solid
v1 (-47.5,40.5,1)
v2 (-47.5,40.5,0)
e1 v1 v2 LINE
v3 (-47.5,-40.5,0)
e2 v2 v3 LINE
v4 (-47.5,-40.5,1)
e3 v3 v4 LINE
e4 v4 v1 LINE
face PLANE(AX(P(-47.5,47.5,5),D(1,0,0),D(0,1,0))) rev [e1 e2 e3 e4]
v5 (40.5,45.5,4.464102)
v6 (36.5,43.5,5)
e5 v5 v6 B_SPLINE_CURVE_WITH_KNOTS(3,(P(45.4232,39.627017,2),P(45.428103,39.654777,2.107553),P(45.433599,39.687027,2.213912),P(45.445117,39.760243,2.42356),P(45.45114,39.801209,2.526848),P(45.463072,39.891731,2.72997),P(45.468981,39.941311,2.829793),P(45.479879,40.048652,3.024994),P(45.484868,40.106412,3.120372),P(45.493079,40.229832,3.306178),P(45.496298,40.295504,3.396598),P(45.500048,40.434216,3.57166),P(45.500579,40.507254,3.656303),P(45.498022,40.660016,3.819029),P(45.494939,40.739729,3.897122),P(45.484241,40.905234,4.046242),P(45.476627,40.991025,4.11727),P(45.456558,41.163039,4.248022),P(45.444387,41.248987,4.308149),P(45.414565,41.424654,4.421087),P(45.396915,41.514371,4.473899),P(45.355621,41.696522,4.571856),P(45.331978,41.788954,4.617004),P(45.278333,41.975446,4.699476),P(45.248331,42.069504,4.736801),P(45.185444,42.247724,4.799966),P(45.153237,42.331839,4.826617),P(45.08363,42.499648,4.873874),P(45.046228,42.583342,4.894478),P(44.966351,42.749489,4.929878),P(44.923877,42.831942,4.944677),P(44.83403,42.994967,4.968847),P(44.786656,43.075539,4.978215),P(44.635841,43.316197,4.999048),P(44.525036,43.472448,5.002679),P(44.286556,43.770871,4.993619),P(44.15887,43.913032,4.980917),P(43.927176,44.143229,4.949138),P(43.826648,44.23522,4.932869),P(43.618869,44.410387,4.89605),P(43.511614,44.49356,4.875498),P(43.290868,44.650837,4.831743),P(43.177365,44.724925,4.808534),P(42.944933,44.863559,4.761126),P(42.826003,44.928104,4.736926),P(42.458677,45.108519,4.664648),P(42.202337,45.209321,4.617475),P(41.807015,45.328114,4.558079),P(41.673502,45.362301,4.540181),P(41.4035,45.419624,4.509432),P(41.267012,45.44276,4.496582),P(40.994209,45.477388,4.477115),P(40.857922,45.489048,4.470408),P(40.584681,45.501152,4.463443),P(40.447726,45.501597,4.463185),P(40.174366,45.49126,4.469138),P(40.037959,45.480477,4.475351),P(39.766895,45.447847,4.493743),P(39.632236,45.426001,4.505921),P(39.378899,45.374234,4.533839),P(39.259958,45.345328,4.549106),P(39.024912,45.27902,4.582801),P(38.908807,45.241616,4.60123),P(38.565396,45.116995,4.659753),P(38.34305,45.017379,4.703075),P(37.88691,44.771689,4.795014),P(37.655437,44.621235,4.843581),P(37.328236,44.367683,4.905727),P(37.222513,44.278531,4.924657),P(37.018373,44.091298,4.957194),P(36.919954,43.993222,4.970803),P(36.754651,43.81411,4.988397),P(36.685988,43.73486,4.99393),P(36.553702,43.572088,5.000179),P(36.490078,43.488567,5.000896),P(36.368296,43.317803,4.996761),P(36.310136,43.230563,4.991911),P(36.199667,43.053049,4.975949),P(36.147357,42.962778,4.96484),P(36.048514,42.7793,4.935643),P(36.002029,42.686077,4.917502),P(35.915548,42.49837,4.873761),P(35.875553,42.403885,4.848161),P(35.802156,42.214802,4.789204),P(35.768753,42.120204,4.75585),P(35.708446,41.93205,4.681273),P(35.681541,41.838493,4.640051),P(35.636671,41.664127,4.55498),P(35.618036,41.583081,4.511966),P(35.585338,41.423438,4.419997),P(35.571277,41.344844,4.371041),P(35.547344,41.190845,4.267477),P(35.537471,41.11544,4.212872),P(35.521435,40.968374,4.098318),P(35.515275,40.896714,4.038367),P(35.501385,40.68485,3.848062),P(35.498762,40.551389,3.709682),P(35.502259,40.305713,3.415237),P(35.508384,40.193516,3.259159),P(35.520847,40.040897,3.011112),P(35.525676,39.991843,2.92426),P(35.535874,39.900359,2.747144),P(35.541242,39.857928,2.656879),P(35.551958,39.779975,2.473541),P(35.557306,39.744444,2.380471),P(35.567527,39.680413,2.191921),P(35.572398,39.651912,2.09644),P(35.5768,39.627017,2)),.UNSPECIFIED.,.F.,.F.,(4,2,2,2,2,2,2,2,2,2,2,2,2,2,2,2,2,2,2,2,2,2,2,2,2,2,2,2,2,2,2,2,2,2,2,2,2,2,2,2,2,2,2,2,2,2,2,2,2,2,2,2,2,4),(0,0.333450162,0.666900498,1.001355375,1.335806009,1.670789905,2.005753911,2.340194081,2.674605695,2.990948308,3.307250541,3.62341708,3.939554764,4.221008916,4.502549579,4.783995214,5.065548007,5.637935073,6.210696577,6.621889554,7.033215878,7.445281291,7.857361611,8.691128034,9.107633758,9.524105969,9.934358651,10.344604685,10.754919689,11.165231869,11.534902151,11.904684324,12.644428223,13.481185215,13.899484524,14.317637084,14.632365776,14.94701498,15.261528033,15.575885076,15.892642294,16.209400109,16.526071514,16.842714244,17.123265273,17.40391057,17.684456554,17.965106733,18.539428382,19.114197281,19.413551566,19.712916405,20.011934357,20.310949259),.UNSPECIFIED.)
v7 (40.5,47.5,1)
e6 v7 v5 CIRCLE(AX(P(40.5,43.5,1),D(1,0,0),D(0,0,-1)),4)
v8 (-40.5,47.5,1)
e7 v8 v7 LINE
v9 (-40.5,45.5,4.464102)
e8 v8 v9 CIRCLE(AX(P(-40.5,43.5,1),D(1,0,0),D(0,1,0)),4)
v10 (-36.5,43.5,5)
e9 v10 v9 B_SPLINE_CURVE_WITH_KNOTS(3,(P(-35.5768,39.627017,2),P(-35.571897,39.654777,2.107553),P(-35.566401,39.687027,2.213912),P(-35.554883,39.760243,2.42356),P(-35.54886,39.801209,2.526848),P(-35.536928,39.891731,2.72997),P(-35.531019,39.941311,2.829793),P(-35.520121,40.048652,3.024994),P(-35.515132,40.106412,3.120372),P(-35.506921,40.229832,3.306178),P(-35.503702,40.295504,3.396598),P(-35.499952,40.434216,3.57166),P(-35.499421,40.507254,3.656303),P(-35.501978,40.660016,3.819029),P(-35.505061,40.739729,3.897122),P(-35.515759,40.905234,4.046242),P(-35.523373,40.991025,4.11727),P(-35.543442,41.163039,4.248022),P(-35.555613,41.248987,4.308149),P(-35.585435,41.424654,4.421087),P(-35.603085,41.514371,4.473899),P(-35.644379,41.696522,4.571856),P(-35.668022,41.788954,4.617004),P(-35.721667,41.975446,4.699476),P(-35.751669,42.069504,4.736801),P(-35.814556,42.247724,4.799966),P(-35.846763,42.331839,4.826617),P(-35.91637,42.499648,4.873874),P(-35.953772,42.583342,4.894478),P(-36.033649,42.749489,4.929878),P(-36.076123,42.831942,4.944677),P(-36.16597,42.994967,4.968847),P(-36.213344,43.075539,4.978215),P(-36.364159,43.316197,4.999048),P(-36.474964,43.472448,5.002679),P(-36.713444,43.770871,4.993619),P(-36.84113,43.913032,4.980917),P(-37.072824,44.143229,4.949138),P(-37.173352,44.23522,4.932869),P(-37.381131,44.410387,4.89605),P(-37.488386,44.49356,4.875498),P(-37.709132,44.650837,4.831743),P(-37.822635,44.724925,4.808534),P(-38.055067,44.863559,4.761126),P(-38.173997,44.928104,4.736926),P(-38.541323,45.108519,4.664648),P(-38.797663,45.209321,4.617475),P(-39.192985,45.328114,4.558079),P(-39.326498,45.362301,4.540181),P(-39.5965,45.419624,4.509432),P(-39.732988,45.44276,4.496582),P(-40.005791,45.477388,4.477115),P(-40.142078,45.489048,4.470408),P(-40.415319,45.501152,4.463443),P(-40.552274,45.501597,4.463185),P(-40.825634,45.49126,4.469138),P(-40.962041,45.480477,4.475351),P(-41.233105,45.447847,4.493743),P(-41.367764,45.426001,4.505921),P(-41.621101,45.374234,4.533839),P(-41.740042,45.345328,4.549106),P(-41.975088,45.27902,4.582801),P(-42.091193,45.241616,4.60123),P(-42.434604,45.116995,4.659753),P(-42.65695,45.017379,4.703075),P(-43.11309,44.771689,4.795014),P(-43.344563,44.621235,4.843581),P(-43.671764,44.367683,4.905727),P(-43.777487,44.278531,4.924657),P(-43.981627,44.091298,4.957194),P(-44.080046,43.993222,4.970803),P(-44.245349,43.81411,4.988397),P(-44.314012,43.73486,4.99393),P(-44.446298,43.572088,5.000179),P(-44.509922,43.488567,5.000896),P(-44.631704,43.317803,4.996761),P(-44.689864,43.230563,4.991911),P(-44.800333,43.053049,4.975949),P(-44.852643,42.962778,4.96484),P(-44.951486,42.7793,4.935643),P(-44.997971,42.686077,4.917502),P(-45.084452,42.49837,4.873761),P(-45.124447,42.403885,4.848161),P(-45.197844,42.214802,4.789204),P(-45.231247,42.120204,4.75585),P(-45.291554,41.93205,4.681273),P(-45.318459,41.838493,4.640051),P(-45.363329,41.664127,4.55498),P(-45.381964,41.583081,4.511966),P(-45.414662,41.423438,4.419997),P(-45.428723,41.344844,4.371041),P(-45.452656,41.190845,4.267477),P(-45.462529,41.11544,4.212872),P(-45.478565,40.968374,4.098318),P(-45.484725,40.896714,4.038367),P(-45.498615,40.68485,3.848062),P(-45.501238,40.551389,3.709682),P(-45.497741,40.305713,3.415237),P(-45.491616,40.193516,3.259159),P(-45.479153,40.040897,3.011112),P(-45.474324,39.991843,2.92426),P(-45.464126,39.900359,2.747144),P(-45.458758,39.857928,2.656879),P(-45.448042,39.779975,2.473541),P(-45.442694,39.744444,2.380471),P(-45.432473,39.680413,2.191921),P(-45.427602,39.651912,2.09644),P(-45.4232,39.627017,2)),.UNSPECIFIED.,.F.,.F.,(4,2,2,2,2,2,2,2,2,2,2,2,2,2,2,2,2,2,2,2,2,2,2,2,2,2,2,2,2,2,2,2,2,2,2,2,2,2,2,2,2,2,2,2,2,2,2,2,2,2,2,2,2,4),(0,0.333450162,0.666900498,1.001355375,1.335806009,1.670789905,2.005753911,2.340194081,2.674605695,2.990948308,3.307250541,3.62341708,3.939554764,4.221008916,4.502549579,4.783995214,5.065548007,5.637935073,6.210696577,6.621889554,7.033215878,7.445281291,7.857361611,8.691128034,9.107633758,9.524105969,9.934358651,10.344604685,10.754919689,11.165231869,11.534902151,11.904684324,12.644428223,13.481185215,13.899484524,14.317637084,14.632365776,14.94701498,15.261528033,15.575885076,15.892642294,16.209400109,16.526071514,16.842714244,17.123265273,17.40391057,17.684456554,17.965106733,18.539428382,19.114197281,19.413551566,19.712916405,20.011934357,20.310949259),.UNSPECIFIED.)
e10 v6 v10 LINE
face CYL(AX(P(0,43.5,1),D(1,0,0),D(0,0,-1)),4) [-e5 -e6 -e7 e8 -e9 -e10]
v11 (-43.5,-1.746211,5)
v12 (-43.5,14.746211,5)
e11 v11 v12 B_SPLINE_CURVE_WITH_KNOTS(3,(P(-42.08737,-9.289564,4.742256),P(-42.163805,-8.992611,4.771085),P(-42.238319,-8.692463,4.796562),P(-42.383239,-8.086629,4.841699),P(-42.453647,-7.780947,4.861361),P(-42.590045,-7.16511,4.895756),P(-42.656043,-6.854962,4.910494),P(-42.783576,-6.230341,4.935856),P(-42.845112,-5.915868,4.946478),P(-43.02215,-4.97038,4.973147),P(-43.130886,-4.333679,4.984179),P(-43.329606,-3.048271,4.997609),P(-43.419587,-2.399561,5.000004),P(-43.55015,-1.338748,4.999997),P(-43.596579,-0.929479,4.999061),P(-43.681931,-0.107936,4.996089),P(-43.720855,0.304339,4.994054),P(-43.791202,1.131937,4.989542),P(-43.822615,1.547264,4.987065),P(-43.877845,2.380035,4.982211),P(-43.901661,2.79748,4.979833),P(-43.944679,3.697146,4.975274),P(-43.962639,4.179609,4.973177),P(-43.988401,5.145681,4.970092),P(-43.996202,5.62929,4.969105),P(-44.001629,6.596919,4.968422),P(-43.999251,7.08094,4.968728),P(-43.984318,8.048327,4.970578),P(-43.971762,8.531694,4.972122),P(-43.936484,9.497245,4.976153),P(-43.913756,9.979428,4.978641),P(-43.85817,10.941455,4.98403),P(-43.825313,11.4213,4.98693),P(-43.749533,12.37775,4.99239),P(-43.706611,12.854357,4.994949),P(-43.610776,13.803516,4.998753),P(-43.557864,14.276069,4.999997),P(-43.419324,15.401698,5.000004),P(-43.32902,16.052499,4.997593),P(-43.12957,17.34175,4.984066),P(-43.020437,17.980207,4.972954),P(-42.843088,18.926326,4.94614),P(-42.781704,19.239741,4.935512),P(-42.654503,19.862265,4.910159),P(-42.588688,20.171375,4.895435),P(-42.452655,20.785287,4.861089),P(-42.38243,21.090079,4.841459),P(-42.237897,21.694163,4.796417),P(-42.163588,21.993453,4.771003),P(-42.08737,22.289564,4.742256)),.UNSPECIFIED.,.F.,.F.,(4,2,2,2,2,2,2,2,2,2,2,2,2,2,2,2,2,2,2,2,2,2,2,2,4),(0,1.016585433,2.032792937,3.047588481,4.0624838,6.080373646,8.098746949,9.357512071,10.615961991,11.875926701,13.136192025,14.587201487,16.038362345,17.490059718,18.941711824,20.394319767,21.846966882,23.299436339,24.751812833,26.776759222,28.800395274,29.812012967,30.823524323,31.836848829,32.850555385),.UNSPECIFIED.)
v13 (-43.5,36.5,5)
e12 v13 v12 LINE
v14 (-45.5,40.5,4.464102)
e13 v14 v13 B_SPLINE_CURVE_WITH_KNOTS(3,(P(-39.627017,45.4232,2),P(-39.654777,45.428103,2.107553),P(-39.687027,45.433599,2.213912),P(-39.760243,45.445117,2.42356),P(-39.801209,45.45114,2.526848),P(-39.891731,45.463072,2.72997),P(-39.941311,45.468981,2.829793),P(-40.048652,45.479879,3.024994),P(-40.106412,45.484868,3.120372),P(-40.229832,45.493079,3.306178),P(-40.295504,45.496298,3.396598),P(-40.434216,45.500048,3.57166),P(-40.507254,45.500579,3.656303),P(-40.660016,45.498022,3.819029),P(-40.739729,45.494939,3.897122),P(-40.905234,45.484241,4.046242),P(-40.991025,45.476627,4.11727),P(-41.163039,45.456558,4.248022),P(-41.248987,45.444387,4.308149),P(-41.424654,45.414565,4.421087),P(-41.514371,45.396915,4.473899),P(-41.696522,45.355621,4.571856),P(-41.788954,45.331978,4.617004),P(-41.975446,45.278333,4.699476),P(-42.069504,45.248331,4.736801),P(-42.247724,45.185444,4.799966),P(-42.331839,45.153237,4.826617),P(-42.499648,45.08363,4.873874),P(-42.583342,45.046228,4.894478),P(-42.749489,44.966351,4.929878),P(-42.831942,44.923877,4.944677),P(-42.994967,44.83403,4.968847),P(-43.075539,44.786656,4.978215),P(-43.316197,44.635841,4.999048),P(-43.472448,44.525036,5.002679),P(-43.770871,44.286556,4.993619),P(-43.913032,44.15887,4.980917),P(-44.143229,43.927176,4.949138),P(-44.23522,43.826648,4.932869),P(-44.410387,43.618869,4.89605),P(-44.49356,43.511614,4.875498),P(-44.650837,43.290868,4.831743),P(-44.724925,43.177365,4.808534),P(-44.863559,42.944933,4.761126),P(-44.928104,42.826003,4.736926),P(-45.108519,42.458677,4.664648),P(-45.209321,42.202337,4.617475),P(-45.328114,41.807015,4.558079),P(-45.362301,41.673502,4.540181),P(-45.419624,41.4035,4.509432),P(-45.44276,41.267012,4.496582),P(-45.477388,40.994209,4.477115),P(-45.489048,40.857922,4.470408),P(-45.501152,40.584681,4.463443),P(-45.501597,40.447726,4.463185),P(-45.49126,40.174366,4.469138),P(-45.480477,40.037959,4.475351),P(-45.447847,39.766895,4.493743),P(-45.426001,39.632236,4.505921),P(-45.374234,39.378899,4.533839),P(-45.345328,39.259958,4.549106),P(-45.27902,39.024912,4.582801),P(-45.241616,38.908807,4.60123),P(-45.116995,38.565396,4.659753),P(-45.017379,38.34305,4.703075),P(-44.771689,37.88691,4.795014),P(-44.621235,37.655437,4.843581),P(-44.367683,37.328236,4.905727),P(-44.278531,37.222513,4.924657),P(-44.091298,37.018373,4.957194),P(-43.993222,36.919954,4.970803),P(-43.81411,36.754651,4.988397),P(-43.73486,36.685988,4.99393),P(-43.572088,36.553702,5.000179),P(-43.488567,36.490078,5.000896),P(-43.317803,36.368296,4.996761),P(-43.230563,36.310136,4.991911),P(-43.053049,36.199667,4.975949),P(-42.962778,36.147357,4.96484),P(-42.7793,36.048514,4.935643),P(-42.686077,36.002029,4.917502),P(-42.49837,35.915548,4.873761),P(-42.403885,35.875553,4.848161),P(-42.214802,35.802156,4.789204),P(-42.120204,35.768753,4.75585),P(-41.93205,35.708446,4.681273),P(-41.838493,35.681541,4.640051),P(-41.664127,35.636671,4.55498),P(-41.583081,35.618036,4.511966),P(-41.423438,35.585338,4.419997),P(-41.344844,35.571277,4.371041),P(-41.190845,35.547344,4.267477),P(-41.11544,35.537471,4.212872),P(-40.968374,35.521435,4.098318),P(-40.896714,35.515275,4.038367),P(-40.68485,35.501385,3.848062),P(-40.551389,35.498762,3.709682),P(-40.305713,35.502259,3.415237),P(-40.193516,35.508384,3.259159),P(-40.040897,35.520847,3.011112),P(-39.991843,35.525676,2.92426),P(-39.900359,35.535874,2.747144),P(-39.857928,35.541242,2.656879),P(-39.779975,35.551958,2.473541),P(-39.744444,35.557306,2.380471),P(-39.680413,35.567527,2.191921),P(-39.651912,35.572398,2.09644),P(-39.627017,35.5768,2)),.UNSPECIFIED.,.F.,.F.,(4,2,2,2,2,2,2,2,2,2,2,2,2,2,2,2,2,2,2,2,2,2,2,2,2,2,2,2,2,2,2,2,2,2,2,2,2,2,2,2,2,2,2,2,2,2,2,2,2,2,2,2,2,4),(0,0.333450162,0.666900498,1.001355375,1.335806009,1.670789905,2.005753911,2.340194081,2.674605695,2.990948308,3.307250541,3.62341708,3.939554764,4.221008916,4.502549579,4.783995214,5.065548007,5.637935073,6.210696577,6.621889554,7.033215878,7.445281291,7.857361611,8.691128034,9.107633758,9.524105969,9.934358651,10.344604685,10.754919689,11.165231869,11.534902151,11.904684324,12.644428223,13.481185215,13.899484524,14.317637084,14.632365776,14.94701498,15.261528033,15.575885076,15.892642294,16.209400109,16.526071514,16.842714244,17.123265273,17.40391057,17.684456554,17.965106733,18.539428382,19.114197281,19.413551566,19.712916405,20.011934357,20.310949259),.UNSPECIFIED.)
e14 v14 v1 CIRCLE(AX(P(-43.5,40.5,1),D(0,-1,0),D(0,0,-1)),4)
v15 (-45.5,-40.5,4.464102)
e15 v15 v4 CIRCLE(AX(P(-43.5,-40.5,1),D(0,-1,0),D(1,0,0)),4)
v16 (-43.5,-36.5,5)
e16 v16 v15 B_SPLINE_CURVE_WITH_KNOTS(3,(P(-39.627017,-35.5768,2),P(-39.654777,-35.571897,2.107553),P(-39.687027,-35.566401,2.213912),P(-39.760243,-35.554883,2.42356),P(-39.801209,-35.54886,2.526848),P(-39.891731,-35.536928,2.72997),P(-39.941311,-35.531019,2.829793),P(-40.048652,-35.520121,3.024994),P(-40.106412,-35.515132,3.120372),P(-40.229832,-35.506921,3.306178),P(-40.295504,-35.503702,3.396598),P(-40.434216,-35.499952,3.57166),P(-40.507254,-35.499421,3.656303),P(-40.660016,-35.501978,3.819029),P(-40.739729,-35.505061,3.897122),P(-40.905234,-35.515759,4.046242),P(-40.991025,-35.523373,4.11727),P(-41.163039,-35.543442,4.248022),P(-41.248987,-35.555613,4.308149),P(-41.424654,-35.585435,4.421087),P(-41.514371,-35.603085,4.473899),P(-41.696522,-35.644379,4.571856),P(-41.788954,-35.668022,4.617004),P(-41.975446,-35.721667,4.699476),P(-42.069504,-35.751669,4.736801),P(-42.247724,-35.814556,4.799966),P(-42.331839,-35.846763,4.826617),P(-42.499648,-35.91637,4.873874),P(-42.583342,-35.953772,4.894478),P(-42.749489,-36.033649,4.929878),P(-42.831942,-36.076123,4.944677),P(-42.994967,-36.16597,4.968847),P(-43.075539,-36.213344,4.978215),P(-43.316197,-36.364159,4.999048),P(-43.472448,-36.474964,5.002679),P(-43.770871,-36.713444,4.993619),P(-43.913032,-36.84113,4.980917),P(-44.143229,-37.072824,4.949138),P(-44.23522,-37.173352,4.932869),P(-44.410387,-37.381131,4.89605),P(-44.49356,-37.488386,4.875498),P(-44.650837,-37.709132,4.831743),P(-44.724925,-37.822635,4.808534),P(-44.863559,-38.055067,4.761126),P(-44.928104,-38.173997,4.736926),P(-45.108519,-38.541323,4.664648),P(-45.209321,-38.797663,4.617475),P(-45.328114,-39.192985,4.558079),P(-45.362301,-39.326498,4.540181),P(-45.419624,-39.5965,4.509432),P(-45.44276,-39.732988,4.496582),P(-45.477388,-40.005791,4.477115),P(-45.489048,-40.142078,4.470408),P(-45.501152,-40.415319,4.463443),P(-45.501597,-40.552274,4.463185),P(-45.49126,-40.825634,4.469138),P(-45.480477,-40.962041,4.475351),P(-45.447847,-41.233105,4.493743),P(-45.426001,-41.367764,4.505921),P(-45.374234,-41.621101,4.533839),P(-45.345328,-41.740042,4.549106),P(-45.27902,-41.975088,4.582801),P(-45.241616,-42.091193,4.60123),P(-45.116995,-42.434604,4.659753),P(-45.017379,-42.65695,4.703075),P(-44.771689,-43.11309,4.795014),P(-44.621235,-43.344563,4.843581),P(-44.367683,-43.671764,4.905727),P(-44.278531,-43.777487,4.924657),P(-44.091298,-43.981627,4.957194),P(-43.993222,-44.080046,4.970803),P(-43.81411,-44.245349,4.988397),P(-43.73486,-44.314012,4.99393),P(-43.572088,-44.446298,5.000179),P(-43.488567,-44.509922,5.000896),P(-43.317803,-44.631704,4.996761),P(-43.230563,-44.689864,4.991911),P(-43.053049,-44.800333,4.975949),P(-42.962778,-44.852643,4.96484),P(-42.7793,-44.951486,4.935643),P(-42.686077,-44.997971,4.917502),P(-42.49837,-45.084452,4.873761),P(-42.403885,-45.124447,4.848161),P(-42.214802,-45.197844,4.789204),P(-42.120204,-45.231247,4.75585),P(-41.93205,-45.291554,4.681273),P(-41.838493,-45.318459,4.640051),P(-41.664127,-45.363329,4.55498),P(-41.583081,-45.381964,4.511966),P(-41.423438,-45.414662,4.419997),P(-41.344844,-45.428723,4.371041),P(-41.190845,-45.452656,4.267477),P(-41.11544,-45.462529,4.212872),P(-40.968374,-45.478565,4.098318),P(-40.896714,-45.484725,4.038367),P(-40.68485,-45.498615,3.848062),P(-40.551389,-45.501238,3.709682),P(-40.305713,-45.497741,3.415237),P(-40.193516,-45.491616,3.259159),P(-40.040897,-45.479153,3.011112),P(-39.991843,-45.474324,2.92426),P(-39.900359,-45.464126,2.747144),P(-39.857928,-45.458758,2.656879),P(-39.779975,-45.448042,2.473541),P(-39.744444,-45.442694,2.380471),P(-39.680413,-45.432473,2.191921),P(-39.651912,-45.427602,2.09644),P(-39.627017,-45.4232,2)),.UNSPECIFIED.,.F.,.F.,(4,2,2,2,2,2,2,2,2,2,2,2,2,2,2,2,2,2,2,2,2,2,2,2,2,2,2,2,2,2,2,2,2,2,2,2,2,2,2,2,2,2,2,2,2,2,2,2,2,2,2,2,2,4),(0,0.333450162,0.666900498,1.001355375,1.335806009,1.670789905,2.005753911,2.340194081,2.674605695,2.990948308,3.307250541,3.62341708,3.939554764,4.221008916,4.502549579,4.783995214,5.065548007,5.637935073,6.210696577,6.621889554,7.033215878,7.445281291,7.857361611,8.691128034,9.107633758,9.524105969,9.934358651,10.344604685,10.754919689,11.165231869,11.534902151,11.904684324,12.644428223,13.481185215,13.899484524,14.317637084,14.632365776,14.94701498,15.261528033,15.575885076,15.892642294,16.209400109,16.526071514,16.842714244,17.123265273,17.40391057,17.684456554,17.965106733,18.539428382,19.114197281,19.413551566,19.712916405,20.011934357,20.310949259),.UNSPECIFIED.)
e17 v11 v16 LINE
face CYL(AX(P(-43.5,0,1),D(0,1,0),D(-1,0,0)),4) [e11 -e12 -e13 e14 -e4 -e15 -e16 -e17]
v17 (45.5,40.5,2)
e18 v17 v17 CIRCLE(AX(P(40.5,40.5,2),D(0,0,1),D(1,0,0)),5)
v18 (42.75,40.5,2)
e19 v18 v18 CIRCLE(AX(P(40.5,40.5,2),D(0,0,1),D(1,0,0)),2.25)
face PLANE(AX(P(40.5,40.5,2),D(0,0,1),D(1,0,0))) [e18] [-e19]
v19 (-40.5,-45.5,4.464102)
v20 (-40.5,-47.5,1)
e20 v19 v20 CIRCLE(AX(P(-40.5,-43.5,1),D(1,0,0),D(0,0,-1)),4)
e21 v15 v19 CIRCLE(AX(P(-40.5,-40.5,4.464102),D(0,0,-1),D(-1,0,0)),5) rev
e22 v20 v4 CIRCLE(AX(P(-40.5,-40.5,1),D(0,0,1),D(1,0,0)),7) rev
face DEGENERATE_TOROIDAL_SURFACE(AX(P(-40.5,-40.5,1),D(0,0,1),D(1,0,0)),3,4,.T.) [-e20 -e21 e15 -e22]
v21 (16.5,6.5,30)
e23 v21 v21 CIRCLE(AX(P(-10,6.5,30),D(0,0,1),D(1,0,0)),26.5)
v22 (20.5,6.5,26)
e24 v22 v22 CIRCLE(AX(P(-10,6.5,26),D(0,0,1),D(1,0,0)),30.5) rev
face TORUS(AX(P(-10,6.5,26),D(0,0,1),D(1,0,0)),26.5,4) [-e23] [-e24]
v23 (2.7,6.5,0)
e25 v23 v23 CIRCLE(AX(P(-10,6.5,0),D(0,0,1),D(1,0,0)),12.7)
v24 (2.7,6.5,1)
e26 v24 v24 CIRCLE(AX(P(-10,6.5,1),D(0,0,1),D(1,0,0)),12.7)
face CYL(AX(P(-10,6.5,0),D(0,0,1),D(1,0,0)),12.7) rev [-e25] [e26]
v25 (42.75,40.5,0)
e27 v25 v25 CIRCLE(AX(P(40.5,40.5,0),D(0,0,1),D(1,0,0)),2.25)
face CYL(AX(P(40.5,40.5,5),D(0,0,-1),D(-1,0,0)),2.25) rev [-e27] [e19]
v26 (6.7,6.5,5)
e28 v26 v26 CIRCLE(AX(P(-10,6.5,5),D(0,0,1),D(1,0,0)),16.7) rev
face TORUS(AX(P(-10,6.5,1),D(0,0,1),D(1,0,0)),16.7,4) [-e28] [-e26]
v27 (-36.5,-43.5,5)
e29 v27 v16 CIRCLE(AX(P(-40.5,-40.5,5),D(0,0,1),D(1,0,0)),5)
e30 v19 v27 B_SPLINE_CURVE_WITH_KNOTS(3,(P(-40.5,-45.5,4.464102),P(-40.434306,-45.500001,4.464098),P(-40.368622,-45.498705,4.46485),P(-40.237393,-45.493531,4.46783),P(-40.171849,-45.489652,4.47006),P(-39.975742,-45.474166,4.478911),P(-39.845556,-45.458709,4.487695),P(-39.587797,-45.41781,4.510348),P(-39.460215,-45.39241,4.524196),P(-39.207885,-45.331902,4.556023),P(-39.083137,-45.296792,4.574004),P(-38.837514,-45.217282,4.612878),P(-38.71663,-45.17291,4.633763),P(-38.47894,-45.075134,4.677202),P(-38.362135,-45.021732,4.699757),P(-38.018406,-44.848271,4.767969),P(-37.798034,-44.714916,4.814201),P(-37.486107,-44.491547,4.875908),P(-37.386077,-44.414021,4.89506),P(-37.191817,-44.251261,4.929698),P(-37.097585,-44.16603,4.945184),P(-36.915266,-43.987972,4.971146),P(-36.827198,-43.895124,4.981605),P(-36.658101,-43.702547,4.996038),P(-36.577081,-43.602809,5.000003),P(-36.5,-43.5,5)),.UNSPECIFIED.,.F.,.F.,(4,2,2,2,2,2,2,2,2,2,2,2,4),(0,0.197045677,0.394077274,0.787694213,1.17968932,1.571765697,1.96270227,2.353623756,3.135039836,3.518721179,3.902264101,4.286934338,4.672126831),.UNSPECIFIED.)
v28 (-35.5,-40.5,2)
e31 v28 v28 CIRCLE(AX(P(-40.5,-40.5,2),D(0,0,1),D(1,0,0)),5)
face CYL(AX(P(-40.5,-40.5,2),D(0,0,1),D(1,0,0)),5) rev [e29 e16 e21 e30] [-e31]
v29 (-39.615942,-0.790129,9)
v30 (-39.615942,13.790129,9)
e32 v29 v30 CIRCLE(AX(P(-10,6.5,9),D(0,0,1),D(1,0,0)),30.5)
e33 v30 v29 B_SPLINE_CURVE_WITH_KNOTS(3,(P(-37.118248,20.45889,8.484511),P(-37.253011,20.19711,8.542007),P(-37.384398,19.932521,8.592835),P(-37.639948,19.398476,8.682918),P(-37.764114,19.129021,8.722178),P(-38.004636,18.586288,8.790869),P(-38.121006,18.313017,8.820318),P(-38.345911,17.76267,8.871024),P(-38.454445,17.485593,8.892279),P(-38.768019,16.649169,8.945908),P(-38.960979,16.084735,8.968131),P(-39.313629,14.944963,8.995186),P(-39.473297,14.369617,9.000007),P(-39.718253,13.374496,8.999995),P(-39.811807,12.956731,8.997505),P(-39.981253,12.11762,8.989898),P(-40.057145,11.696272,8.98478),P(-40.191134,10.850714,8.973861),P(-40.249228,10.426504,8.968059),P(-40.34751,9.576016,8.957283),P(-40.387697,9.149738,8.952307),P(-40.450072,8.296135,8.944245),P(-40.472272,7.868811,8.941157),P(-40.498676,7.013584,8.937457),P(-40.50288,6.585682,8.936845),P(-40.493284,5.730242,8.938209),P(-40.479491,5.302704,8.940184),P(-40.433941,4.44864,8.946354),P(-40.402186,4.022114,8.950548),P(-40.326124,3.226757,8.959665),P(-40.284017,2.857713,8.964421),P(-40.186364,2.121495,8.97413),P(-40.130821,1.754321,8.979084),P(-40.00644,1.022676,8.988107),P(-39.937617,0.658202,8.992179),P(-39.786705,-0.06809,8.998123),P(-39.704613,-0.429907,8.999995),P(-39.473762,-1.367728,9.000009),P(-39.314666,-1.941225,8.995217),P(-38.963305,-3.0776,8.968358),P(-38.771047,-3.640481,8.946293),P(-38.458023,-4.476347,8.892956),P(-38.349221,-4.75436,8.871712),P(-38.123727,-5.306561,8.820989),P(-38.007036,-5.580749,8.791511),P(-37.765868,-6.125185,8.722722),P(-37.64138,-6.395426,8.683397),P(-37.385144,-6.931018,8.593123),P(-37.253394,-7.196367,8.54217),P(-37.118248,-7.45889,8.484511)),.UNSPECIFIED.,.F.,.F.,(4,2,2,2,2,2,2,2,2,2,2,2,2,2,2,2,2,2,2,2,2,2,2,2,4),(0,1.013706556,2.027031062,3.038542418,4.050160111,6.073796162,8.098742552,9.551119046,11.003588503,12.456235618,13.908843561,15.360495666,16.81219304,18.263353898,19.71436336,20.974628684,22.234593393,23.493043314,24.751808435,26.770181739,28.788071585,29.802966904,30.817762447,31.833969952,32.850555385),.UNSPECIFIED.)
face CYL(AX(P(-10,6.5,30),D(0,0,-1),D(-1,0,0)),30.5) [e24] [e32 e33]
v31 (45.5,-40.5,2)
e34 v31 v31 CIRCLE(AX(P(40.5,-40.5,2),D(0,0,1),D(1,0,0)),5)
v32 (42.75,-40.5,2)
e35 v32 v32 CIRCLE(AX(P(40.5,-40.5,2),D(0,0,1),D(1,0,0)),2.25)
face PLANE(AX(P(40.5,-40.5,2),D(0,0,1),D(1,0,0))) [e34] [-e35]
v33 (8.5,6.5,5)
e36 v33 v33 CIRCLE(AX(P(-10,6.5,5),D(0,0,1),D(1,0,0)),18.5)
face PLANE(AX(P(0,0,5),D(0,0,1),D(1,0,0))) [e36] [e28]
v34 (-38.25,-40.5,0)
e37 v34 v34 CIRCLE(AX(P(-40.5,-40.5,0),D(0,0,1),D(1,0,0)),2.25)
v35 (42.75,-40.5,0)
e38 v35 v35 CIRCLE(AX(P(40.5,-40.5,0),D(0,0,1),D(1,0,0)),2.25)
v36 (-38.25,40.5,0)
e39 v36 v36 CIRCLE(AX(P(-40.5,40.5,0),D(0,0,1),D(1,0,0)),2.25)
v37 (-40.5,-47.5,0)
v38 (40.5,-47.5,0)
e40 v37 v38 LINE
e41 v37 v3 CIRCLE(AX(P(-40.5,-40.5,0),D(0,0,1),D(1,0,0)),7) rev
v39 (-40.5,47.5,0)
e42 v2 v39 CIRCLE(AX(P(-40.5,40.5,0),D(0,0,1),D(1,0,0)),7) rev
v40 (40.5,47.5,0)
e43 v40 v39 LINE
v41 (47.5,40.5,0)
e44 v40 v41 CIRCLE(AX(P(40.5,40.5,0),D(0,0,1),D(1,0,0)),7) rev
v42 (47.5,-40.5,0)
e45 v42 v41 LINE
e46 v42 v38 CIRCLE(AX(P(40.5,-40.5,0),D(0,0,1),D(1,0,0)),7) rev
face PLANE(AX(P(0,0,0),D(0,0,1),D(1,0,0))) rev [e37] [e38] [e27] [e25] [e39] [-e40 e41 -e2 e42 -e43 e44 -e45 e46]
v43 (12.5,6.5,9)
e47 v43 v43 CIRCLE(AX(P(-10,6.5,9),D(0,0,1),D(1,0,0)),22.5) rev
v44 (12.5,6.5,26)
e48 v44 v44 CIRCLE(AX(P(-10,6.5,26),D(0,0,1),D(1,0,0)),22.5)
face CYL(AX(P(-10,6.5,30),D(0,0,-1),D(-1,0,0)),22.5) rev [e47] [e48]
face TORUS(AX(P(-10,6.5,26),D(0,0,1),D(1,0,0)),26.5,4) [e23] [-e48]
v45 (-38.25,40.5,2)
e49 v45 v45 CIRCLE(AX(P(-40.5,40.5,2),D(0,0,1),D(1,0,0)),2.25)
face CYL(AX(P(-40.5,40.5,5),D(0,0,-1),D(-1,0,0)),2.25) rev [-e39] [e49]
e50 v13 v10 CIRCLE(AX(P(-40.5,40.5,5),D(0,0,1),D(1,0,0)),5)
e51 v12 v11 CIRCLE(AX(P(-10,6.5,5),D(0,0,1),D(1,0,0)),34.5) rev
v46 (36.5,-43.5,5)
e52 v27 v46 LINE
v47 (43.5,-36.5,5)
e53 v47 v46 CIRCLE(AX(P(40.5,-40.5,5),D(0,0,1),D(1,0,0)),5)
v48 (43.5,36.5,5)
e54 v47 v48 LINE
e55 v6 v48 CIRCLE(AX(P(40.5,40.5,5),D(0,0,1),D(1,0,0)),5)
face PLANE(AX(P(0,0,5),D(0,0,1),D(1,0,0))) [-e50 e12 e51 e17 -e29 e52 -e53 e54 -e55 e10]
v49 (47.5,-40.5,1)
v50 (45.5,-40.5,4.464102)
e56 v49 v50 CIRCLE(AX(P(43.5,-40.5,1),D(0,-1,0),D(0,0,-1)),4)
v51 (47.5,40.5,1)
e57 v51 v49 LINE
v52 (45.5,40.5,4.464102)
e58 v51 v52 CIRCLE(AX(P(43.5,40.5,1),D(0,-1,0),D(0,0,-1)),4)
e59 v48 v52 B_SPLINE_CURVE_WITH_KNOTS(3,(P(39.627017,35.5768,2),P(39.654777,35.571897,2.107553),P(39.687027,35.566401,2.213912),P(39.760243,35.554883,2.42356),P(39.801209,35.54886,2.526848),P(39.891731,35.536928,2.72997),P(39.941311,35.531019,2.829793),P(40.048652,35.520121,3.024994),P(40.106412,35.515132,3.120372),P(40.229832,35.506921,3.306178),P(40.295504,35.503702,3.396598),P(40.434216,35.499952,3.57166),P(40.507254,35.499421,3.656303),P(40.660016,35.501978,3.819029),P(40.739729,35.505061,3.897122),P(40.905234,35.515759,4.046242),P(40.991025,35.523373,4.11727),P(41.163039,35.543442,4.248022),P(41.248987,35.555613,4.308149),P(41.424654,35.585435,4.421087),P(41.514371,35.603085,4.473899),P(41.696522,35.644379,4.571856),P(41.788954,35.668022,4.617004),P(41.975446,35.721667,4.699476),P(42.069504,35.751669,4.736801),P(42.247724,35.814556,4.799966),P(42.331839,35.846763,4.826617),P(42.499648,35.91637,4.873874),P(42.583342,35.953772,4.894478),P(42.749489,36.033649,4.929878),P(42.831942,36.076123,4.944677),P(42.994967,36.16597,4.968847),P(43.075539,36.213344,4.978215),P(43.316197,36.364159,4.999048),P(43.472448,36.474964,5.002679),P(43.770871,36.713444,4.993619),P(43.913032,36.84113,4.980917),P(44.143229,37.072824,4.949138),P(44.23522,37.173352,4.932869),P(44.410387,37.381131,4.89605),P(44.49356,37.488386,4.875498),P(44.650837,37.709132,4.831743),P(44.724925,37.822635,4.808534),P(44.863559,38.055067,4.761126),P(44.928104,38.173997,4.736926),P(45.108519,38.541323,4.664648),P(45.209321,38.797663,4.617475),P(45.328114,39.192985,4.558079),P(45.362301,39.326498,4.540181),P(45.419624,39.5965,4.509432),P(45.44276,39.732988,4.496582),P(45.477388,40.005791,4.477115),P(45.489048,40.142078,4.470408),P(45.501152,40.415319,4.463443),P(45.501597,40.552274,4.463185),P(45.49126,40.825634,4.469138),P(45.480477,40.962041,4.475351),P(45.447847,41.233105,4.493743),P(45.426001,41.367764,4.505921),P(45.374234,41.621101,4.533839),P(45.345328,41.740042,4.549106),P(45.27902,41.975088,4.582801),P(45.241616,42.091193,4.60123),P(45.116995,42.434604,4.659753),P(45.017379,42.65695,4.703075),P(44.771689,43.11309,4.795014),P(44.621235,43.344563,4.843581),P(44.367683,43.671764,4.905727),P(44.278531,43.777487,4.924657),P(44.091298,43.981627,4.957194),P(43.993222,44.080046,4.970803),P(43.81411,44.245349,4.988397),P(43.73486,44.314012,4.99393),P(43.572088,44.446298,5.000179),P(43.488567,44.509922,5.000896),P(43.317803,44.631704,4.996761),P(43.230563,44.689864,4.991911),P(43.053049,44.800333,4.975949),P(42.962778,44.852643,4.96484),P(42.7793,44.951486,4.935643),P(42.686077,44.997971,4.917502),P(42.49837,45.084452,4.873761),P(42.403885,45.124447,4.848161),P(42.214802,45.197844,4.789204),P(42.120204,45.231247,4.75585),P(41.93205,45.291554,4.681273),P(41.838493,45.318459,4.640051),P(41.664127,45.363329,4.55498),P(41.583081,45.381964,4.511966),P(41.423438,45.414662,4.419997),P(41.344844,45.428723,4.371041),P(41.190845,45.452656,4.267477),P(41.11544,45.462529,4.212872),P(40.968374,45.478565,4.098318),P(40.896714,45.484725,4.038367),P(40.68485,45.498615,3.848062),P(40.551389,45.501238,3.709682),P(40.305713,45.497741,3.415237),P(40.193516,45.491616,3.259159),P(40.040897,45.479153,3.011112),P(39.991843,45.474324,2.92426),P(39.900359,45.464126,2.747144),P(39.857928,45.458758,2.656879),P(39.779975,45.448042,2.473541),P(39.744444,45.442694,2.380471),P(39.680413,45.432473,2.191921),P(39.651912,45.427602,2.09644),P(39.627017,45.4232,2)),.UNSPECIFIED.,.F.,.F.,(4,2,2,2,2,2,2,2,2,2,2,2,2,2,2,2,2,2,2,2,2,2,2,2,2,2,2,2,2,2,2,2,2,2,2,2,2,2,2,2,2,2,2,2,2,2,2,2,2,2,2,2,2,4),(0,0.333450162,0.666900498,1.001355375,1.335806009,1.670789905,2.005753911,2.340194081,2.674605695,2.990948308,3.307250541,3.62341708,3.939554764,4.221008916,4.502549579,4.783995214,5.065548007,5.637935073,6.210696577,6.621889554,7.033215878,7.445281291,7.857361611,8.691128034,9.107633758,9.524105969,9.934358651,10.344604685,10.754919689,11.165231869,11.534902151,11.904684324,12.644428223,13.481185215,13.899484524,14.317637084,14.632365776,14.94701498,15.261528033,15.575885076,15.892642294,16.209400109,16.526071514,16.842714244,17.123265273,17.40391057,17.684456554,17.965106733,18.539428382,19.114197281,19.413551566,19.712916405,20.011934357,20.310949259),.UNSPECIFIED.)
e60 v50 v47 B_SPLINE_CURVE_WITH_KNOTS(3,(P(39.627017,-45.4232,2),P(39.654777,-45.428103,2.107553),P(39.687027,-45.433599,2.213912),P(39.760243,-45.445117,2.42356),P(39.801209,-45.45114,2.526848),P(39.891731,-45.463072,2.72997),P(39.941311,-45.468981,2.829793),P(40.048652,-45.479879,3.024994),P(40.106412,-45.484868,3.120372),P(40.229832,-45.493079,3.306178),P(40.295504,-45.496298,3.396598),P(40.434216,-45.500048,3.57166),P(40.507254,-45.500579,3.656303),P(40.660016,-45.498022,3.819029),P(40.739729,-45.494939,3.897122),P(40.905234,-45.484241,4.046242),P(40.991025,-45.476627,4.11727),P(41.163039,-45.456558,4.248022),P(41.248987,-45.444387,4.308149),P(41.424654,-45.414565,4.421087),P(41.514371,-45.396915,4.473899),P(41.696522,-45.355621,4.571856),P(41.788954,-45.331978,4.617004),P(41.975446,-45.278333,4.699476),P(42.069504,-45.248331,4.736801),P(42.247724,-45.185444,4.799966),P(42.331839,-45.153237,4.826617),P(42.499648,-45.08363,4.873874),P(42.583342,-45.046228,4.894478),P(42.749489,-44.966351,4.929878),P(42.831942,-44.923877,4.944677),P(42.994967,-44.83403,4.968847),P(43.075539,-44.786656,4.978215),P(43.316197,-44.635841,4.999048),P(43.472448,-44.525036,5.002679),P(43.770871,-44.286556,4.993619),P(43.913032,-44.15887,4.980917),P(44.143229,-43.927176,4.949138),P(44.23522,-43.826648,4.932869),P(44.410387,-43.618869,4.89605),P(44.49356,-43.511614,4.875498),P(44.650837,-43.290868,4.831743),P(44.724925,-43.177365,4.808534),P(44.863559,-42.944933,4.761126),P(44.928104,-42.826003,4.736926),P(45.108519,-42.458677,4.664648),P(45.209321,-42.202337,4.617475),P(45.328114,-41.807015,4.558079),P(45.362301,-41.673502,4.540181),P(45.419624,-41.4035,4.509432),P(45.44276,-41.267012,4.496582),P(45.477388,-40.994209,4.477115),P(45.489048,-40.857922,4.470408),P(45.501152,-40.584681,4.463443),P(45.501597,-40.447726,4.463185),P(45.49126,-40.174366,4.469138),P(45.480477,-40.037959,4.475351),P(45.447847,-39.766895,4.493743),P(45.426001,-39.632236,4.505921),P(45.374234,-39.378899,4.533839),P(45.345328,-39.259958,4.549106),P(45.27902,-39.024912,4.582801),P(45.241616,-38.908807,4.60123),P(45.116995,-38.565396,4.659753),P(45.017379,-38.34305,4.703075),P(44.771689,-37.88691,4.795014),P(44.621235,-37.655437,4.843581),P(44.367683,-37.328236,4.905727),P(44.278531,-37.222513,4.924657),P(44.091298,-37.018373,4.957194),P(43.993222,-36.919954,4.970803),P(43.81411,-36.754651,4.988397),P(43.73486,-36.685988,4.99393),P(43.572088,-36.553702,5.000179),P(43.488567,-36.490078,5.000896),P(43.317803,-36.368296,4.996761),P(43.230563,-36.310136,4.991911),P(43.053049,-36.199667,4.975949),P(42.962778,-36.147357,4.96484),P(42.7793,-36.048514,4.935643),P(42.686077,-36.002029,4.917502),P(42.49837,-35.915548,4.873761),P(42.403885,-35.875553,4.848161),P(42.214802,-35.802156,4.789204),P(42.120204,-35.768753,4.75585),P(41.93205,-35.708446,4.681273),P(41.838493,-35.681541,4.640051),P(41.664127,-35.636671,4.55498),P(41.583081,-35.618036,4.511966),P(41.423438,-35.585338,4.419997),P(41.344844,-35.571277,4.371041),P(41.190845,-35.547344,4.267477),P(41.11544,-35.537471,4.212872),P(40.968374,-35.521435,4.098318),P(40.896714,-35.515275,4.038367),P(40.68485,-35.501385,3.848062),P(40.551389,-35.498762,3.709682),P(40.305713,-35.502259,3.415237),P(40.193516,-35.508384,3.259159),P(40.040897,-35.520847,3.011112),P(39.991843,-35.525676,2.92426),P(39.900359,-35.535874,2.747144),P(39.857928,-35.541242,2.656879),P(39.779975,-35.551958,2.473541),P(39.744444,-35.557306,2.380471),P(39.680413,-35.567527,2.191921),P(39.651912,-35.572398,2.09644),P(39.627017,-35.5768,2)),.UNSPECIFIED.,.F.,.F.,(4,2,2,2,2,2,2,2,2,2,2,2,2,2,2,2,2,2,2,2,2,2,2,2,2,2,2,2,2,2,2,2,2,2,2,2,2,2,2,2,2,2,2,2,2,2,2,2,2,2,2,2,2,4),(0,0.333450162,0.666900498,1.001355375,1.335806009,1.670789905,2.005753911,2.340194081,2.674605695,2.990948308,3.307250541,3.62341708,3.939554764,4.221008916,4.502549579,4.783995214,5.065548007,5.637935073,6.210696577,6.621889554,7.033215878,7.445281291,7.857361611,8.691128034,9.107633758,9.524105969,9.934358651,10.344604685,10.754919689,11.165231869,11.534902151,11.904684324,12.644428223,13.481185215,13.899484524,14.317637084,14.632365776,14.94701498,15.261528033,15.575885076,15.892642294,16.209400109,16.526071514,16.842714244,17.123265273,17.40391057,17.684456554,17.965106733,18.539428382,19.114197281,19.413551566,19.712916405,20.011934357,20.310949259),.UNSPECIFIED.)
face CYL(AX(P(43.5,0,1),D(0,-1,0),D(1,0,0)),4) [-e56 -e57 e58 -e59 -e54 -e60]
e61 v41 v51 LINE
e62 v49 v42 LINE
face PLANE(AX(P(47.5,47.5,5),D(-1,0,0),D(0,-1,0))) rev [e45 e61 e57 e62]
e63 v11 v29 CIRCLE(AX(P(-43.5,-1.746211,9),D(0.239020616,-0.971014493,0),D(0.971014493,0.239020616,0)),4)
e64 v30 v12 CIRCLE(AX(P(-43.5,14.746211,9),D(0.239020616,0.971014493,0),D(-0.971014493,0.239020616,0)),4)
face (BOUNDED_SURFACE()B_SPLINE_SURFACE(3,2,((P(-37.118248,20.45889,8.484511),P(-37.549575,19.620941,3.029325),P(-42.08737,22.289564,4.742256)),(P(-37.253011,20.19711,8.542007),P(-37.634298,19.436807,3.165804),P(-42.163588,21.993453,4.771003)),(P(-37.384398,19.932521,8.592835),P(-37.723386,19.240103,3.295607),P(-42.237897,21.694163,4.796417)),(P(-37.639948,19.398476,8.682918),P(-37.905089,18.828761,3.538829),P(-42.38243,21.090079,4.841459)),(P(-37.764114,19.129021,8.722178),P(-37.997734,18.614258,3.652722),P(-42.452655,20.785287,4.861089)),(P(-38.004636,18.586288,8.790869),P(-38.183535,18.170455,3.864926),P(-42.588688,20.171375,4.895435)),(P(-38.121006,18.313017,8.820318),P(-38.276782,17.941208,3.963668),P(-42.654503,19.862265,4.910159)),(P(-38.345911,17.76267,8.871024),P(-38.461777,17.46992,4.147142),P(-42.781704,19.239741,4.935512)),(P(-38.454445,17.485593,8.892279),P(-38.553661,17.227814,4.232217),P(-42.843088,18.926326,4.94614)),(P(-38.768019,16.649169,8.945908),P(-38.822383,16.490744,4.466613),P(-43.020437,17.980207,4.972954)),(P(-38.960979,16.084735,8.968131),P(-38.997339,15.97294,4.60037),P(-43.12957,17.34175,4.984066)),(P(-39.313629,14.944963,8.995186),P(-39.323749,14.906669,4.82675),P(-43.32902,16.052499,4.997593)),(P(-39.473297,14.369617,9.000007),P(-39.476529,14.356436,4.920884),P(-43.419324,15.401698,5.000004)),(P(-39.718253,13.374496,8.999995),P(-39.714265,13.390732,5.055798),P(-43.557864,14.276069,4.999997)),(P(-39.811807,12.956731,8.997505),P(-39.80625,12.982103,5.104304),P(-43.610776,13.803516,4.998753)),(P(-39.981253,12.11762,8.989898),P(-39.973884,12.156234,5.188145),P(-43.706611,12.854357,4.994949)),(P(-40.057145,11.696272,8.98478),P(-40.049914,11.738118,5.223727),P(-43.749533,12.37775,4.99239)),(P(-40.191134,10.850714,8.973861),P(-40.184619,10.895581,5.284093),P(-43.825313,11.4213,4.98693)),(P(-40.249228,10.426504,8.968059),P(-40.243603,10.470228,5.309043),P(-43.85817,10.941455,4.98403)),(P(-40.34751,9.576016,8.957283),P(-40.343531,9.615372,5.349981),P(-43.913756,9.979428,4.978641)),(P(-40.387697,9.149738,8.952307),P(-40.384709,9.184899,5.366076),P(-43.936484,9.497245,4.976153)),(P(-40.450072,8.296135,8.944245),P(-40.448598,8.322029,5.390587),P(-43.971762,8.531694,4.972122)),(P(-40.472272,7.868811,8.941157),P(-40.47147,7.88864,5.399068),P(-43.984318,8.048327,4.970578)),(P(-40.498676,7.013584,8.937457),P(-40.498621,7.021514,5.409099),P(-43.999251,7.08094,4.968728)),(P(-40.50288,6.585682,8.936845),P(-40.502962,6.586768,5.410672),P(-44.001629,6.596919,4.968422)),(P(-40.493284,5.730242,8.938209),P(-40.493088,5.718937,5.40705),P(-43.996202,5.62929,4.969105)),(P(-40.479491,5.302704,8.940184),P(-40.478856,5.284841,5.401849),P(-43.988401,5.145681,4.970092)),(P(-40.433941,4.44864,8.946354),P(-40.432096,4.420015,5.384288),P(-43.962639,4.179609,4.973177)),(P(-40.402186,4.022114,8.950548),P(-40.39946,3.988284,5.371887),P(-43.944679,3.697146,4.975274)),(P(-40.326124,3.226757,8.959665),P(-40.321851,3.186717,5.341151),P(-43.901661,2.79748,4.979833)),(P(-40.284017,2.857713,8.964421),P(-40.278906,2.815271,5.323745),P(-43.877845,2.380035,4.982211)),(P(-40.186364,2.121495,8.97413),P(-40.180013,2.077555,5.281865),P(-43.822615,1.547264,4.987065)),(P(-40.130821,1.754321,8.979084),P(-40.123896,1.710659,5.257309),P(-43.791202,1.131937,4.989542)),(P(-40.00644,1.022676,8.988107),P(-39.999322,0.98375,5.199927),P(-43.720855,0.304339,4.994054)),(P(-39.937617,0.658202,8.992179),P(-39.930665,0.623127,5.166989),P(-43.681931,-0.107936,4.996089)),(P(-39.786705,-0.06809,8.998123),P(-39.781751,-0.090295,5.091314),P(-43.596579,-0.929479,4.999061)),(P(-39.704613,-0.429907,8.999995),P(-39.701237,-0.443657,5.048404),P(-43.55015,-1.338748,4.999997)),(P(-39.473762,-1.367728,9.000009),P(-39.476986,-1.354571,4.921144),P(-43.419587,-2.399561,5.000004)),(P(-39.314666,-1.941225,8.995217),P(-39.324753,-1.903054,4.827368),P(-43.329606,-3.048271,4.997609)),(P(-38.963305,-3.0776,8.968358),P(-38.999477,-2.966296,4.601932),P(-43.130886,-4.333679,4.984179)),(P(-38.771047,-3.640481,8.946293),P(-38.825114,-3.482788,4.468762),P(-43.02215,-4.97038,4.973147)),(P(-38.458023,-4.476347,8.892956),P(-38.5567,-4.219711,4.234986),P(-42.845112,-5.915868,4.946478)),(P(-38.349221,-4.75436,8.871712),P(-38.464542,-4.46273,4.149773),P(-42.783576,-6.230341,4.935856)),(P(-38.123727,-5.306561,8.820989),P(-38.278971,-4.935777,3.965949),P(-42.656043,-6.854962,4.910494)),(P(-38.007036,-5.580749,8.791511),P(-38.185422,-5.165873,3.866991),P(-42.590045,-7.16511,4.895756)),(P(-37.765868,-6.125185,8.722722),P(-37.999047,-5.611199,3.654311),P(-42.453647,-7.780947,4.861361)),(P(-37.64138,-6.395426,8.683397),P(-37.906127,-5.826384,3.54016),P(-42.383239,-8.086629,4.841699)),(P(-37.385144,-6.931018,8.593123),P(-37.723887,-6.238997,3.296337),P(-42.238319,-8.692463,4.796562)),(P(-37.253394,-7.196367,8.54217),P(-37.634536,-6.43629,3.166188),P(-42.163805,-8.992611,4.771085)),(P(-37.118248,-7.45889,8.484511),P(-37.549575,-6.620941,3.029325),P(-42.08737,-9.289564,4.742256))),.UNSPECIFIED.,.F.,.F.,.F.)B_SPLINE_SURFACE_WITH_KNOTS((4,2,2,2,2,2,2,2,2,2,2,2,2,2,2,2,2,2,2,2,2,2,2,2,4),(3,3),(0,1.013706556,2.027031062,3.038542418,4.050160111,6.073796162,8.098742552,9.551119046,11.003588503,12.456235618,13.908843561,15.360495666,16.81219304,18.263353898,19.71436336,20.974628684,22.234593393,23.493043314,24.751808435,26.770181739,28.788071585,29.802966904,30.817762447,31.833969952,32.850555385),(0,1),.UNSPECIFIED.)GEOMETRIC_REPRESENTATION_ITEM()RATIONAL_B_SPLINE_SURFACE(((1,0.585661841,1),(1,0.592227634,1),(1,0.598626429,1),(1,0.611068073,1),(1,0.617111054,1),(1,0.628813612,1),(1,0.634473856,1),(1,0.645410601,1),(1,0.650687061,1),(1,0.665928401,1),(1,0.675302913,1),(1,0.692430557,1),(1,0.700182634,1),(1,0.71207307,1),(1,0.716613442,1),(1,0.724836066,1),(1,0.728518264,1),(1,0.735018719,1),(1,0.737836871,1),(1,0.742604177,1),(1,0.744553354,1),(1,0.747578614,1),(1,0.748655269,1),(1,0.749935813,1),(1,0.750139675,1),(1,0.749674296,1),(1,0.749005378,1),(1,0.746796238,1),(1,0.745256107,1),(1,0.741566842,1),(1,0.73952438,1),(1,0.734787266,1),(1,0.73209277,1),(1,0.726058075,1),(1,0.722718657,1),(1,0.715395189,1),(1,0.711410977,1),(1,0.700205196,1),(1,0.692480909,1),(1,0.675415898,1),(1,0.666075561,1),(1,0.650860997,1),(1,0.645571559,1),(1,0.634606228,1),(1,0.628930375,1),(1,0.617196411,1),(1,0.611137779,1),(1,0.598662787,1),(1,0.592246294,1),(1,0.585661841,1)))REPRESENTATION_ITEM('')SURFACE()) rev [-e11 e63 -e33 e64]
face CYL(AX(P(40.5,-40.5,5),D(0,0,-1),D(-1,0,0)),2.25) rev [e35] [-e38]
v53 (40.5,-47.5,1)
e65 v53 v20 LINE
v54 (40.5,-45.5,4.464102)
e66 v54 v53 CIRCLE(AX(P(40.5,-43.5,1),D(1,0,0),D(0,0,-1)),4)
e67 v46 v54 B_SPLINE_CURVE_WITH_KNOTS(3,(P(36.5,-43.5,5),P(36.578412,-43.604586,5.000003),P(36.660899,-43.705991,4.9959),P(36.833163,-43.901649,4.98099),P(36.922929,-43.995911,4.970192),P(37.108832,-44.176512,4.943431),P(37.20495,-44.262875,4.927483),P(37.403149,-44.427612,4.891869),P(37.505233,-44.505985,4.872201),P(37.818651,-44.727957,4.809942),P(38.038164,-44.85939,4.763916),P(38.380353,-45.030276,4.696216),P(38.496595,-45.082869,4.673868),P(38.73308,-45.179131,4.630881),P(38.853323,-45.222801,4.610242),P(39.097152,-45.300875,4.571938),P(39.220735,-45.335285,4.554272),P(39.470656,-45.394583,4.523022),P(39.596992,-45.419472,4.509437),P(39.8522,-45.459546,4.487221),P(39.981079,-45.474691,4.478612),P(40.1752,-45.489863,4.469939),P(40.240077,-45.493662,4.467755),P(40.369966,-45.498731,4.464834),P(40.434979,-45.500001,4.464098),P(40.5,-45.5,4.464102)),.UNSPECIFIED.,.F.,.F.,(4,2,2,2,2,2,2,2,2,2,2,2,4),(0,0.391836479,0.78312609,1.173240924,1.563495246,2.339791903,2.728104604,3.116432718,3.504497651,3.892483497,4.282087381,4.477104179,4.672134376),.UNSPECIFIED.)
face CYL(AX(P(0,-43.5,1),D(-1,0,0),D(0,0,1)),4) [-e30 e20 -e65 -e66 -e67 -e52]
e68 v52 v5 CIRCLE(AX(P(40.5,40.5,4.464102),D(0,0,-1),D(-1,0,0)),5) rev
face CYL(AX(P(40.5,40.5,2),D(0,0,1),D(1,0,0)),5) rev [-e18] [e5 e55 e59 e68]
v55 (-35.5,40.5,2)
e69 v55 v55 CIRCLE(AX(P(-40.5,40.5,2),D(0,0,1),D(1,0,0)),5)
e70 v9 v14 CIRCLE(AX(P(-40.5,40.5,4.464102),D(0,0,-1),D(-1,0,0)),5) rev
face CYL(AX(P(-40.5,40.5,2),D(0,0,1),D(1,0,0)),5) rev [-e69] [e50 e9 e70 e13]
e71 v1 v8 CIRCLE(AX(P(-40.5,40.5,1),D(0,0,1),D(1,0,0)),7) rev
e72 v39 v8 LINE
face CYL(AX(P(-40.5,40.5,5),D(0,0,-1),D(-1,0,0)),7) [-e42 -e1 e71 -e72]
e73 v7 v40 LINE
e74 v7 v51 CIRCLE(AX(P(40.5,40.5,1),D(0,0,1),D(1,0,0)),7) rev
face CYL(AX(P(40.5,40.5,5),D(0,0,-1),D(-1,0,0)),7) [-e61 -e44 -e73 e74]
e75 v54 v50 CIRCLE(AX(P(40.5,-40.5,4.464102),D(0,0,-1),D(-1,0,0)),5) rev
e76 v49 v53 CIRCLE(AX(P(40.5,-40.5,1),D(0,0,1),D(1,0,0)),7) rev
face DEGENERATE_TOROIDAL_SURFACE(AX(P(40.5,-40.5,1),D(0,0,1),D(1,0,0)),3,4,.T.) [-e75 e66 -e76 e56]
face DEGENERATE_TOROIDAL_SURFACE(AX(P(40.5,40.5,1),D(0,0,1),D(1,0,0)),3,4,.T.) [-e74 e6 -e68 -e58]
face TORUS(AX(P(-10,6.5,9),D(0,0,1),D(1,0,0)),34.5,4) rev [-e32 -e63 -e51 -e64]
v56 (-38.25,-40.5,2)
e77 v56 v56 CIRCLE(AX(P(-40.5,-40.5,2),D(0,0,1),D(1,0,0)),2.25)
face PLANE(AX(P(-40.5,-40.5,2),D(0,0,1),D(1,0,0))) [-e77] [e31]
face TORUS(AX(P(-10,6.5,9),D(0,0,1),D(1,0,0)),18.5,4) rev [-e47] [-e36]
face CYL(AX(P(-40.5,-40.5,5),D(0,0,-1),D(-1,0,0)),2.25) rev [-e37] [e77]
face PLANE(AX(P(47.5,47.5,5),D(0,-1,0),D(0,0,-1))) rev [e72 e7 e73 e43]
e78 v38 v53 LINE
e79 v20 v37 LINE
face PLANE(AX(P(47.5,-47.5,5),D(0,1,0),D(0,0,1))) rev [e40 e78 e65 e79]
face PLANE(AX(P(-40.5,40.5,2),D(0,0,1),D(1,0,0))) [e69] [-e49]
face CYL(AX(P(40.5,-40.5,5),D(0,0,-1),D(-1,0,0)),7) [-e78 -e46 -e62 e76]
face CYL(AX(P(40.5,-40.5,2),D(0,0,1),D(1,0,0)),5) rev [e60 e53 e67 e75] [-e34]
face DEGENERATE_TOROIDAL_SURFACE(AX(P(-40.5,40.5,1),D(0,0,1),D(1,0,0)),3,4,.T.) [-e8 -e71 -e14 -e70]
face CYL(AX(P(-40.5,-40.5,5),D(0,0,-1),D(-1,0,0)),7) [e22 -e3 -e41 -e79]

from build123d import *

# Parameters (mm, degrees)
SKETCH2_W           = 95
SKETCH2_H           = 95
SKETCH2_R           = 2.25
BOSS_EXTRUDE1_DEPTH = 5
FILLET1_R           = 7
FILLET2_R           = 4
SKETCH3_R           = 5
CUT_EXTRUDE1_DEPTH  = 3
SKETCH4_R           = 12.7
CUT_EXTRUDE2_DEPTH  = 68.360968068
FILLET3_R           = 4
SKETCH5_R           = 30.5
SKETCH5_R_2         = 22.5
BOSS_EXTRUDE2_DEPTH = 25
FILLET4_R           = 4


with BuildPart() as part:
    # Sketch2 → Boss-Extrude1 (new body)
    with BuildSketch(Plane(origin=(0, 0, 0), x_dir=(0, 1, 0), z_dir=(0, 0, 1))):
        Rectangle(SKETCH2_W, SKETCH2_H)
        with Locations(Location((40.5, 40.5, 0), (0, 0, 270))):
            Circle(SKETCH2_R, mode=Mode.SUBTRACT)
        with Locations(Location((-40.5, 40.5, 0), (0, 0, 270))):
            Circle(SKETCH2_R, mode=Mode.SUBTRACT)
        with Locations(Location((-40.5, -40.5, 0), (0, 0, 270))):
            Circle(SKETCH2_R, mode=Mode.SUBTRACT)
        with Locations(Location((40.5, -40.5, 0), (0, 0, 270))):
            Circle(SKETCH2_R, mode=Mode.SUBTRACT)
    extrude(amount=BOSS_EXTRUDE1_DEPTH)

    # Fillet1
    fillet1_edges = [part.edges().sort_by_distance(p)[0] for p in [
        (-47.5, -47.5, 2.5),
        (-47.5, 47.5, 2.5),
        (47.5, 47.5, 2.5),
        (47.5, -47.5, 2.5),
    ]]
    fillet(fillet1_edges, radius=FILLET1_R)

    # Fillet2
    fillet2_edges = [part.edges().sort_by_distance(p)[0] for p in [
        (0, 47.5, 5),
        (47.5, 0, 5),
        (0, -47.5, 5),
        (-47.5, 0, 5),
        (-45.449747468, 45.449747468, 5),
        (-45.449747468, -45.449747468, 5),
        (45.449747468, -45.449747468, 5),
        (45.449747468, 45.449747468, 5),
    ]]
    fillet(fillet2_edges, radius=FILLET2_R)

    # Sketch3 → Cut-Extrude1 (cut)
    with BuildSketch(Plane.XY.offset(5)):
        with Locations((-40.5, -40.5)):
            Circle(SKETCH3_R)
        with Locations((-40.5, 40.5)):
            Circle(SKETCH3_R)
        with Locations((40.5, 40.5)):
            Circle(SKETCH3_R)
        with Locations((40.5, -40.5)):
            Circle(SKETCH3_R)
    extrude(amount=-CUT_EXTRUDE1_DEPTH, mode=Mode.SUBTRACT)

    # Sketch4 → Cut-Extrude2 (cut, through all)
    with BuildSketch(Plane.XY.offset(5)):
        with Locations((-10, 6.5)):
            Circle(SKETCH4_R)
    extrude(amount=-CUT_EXTRUDE2_DEPTH, mode=Mode.SUBTRACT)

    # Fillet3
    fillet3_edges = [part.edges().sort_by_distance(p)[0] for p in [
        (-22.7, 6.5, 5),
    ]]
    fillet(fillet3_edges, radius=FILLET3_R)

    # Sketch5 → Boss-Extrude2 (add)
    with BuildSketch(Plane.XY.offset(5)):
        with Locations((-10, 6.5)):
            Circle(SKETCH5_R)
        with Locations((-10, 6.5)):
            Circle(SKETCH5_R_2, mode=Mode.SUBTRACT)
    extrude(amount=BOSS_EXTRUDE2_DEPTH)

    # Fillet4
    fillet4_edges = [part.edges().sort_by_distance(p)[0] for p in [
        (-32.5, 6.5, 5),
        (-40.5, 6.5, 30),
        (-40.5, 6.5, 5),
        (-32.5, 6.5, 30),
    ]]
    fillet(fillet4_edges, radius=FILLET4_R - 0.0001)  # a hair under: the kernel refuses the full size


solid = part.part
